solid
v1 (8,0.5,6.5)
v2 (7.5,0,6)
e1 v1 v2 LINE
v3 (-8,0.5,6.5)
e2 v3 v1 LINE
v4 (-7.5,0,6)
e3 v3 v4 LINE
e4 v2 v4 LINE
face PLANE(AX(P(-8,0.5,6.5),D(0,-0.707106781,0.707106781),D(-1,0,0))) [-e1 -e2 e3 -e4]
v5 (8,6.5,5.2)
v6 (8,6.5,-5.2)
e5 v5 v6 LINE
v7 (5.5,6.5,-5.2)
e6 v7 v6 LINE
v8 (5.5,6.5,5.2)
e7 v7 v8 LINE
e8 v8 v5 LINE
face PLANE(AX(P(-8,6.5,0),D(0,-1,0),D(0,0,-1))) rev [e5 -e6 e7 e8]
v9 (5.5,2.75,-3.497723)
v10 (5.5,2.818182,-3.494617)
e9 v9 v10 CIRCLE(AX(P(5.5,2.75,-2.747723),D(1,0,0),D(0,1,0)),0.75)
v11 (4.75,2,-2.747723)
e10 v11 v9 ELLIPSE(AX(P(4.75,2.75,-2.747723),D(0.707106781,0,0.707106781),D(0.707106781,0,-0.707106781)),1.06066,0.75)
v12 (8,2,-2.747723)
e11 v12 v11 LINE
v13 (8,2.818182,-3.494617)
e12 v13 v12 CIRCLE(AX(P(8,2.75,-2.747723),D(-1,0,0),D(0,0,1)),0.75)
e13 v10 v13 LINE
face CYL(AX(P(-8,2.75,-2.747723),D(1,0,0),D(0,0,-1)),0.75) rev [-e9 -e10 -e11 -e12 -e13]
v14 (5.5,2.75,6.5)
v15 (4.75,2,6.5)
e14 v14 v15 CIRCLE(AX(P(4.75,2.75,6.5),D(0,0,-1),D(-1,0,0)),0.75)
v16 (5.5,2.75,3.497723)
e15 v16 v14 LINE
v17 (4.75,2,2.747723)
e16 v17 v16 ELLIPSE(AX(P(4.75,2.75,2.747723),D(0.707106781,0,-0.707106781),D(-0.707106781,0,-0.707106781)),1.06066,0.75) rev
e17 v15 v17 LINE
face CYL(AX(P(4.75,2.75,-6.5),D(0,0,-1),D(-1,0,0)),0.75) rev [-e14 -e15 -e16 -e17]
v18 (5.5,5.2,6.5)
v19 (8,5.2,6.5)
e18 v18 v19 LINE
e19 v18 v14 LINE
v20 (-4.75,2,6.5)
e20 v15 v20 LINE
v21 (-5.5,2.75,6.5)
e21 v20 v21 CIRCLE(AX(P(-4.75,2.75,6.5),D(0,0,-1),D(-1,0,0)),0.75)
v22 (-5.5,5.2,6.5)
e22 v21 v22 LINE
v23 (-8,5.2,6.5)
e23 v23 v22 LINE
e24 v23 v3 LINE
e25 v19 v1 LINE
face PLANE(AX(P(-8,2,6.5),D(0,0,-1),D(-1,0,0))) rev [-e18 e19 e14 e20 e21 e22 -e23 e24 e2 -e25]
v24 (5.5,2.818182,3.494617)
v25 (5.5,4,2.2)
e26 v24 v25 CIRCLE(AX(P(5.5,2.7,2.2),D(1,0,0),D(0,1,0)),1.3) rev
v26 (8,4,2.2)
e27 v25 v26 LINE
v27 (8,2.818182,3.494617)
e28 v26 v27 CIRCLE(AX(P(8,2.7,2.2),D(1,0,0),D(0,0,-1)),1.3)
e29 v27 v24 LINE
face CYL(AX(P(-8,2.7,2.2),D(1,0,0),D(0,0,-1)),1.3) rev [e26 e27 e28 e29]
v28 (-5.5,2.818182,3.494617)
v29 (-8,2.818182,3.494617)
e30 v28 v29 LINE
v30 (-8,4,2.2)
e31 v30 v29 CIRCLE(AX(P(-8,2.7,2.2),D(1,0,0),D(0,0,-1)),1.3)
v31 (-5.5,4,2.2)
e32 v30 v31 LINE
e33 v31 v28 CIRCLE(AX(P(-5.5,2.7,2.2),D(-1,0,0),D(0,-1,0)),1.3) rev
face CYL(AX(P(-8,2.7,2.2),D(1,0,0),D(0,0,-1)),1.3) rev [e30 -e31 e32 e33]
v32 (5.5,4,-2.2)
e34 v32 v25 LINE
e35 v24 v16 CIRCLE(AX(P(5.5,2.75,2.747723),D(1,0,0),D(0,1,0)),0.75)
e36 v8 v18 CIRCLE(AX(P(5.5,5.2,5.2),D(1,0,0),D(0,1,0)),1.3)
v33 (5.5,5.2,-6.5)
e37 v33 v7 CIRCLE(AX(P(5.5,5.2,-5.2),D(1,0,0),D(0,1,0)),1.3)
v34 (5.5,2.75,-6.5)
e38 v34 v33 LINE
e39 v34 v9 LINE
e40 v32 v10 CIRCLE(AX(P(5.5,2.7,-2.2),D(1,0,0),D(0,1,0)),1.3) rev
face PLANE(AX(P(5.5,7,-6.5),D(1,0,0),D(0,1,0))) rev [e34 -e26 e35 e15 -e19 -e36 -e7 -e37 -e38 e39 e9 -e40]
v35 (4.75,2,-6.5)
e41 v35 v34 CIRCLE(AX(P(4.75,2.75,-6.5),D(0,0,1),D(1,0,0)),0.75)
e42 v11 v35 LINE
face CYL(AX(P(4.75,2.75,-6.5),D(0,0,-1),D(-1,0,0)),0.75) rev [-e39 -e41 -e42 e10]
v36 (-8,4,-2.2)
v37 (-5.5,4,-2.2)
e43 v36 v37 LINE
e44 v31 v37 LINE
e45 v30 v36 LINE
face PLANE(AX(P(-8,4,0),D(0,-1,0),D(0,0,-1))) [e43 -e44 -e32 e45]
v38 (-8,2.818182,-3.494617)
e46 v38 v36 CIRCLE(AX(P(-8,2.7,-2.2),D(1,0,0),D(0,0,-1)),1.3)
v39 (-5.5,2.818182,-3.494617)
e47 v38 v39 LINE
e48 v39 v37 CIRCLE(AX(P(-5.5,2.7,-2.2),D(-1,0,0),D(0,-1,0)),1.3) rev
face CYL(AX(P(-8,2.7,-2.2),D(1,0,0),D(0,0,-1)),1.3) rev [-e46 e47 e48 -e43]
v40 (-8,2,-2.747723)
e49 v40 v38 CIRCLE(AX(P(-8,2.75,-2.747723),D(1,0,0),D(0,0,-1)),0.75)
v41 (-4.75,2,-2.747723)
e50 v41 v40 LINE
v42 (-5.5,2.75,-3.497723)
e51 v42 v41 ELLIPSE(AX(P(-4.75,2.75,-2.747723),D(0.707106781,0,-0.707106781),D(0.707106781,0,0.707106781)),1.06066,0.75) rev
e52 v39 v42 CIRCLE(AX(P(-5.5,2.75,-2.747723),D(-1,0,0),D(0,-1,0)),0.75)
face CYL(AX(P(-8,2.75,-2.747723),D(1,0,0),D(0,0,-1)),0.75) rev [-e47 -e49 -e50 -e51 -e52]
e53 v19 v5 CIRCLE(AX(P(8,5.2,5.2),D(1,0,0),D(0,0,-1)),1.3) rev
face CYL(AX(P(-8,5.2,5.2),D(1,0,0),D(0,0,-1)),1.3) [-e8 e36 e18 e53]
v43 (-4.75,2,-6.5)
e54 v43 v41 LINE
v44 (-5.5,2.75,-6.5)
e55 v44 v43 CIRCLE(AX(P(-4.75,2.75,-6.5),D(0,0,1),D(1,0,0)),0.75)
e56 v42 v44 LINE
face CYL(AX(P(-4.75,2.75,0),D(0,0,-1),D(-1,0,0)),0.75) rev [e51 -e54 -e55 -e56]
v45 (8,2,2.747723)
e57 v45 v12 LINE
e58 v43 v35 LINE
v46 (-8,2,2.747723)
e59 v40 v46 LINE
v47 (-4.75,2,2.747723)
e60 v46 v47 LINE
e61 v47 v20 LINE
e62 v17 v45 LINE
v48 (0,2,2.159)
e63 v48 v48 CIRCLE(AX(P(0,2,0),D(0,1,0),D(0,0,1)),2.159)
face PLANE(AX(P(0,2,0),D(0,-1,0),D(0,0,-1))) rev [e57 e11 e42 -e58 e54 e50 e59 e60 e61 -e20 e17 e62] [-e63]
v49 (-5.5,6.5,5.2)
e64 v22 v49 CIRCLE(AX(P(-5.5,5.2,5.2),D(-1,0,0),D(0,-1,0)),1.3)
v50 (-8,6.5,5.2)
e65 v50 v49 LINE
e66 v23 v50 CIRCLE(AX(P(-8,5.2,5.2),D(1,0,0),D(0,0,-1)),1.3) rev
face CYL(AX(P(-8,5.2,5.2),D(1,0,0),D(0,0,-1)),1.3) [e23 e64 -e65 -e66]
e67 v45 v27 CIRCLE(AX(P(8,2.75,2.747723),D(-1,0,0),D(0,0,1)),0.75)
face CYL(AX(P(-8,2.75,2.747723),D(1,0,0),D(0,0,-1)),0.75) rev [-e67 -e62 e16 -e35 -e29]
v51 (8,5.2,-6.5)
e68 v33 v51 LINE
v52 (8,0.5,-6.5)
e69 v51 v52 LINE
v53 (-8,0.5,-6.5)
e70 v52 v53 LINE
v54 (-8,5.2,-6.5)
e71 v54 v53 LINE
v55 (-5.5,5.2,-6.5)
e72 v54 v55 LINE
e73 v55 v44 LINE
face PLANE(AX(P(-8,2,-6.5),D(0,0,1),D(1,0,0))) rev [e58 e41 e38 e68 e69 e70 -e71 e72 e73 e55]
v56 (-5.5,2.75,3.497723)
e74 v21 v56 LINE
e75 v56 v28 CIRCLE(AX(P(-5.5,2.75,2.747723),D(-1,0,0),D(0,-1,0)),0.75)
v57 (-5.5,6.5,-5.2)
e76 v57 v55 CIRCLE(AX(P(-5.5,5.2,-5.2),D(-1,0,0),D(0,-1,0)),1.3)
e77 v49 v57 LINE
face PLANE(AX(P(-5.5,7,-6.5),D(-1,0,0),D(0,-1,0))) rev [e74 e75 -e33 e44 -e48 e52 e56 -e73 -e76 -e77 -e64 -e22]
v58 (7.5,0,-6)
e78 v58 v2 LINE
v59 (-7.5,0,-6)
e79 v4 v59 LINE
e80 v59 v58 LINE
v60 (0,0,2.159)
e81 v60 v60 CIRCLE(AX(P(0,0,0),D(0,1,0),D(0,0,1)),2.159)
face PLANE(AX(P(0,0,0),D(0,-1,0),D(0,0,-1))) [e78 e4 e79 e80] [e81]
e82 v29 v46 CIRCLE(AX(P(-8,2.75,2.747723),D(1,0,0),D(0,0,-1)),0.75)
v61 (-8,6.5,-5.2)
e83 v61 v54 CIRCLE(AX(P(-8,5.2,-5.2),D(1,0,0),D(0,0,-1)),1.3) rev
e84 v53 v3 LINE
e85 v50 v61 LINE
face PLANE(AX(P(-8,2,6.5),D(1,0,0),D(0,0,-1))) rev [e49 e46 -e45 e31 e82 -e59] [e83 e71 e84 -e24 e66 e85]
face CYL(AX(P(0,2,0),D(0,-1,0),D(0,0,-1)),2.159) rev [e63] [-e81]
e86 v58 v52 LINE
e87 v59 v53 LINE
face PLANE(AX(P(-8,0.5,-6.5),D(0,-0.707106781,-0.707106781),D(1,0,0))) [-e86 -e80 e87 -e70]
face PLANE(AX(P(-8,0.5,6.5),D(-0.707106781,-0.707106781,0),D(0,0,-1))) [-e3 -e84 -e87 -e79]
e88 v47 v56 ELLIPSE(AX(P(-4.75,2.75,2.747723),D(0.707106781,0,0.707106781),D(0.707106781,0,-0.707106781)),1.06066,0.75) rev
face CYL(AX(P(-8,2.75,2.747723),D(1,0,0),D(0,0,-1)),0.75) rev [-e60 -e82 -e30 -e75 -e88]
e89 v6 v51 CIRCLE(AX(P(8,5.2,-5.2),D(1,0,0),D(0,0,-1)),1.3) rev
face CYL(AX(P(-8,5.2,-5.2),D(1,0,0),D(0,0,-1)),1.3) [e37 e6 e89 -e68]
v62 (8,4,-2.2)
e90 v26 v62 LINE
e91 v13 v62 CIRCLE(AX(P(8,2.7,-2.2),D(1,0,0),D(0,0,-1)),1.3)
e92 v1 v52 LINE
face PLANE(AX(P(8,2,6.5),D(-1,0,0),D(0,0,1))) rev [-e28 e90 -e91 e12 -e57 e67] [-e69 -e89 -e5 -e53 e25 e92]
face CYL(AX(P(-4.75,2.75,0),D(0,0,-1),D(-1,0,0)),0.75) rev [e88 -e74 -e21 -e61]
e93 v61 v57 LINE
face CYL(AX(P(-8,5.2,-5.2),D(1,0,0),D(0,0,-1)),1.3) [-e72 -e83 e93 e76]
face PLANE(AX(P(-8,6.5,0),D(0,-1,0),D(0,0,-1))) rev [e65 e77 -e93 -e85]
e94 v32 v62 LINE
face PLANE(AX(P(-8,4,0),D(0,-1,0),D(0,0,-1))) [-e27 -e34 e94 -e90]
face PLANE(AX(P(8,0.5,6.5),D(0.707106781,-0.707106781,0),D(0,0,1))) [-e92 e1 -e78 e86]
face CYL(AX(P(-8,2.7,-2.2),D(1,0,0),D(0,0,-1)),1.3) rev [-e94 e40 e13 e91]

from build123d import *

# Parameters (mm, degrees)
SKETCH1_W               = 16
SKETCH1_H               = 13
SKETCH1_R               = 2.159
BOSS_EXTRUDE1_DEPTH     = 2
BOSS_EXTRUDE2_DEPTH     = 16
CUT_EXTRUDE1_DEPTH      = 17.590660023
CUT_EXTRUDE1_DEPTH_BACK = 17.590660023
SKETCH4_W               = 11
SKETCH4_H               = 5
FILLET1_R               = 0.75
CHAMFER1_SIZE           = 0.5


with BuildPart() as part:
    # Sketch1 → Boss-Extrude1 (new body)
    with BuildSketch(Plane(origin=(0, 0, 0), x_dir=(1, 0, 0), z_dir=(0, 1, 0))):
        Rectangle(SKETCH1_W, SKETCH1_H)
        with Locations(Location((0, 0, 0), (0, 0, 270))):
            Circle(SKETCH1_R, mode=Mode.SUBTRACT)
    extrude(amount=BOSS_EXTRUDE1_DEPTH)

    # Sketch2 → Boss-Extrude2 (add)
    with BuildSketch(Plane(origin=(8, 0, 0), x_dir=(0, 0, -1), z_dir=(1, 0, 0))):
        with BuildLine():
            Line((-6.5, 5.2), (-6.5, 2))
            Line((-6.5, 2), (-3.5, 2))
            Line((-3.5, 2), (-3.5, 2.7))
            ThreePointArc((-3.5, 2.7), (-3.119238816, 3.619238816), (-2.2, 4))
            Line((-2.2, 4), (2.2, 4))
            ThreePointArc((2.2, 4), (3.119238816, 3.619238816), (3.5, 2.7))
            Line((3.5, 2.7), (3.5, 2))
            Line((3.5, 2), (6.5, 2))
            Line((6.5, 2), (6.5, 5.2))
            ThreePointArc((6.5, 5.2), (6.119238816, 6.119238816), (5.2, 6.5))
            Line((5.2, 6.5), (-5.2, 6.5))
            ThreePointArc((-5.2, 6.5), (-6.119238816, 6.119238816), (-6.5, 5.2))
        make_face()
    extrude(amount=-BOSS_EXTRUDE2_DEPTH)

    # Sketch4 → Cut-Extrude1 (cut, two sides: drawn at the far end of the back side and taken through both)
    with BuildSketch(Plane.XY.offset(6.5).offset(-CUT_EXTRUDE1_DEPTH_BACK)):
        with Locations((0, 4.5)):
            Rectangle(SKETCH4_W, SKETCH4_H)
    extrude(amount=CUT_EXTRUDE1_DEPTH + CUT_EXTRUDE1_DEPTH_BACK, mode=Mode.SUBTRACT)

    # Fillet1
    # the kernel refuses this fillet: 0.75 mm, written as the material it adds along each edge
    with BuildSketch(Plane(origin=(-5.5, 2, 3.5), x_dir=(1, 0, 0), z_dir=(0, 0, 1)), Plane(origin=(-5.5, 2, -6.5), x_dir=(1, 0, 0), z_dir=(0, 0, 1))) as fillet1_piece_1:
        with BuildLine():
            CenterArc((FILLET1_R, FILLET1_R), FILLET1_R, 180, 90)
            Line((0, FILLET1_R), (-FILLET1_R * 0.02, FILLET1_R))
            Line((-FILLET1_R * 0.02, FILLET1_R), (-FILLET1_R * 0.02, -FILLET1_R * 0.02))
            Line((-FILLET1_R * 0.02, -FILLET1_R * 0.02), (FILLET1_R, -FILLET1_R * 0.02))
            Line((FILLET1_R, -FILLET1_R * 0.02), (FILLET1_R, 0))
        make_face()
    extrude(amount=3)
    with BuildSketch(Plane(origin=(-5.5, 2, 3.5), x_dir=(0, 0, -1), z_dir=(-1, 0, 0)), Plane(origin=(8, 2, 3.5), x_dir=(0, 0, -1), z_dir=(-1, 0, 0))) as fillet1_piece_2:
        with BuildLine():
            CenterArc((0.752277442, -0.75), FILLET1_R, 90, 95.21590857)
            Line((0.005383046, -0.818181818), (-0.069306394, -0.825))
            ThreePointArc((-0.069306394, -0.825), (-0.075, -0.7), (-0.075, 0))
            Line((-0.075, 0), (0, 0.075))
            Line((0, 0.075), (0.752277442, 0.075))
            Line((0.752277442, 0.075), (0.752277442, 0))
        make_face()
    extrude(amount=2.5)
    with BuildSketch(Plane(origin=(5.5, 2, 6.5), x_dir=(0, 1, 0), z_dir=(0, 0, -1)), Plane(origin=(5.5, 2, -3.5), x_dir=(0, 1, 0), z_dir=(0, 0, -1))) as fillet1_piece_3:
        with BuildLine():
            CenterArc((FILLET1_R, -FILLET1_R), FILLET1_R, 90, 90)
            Line((0, -FILLET1_R), (-FILLET1_R * 0.02, -FILLET1_R))
            Line((-FILLET1_R * 0.02, -FILLET1_R), (-FILLET1_R * 0.02, FILLET1_R * 0.02))
            Line((-FILLET1_R * 0.02, FILLET1_R * 0.02), (FILLET1_R, FILLET1_R * 0.02))
            Line((FILLET1_R, FILLET1_R * 0.02), (FILLET1_R, 0))
        make_face()
    extrude(amount=3)
    with BuildSketch(Plane(origin=(8, 2, -3.5), x_dir=(0, 0, 1), z_dir=(-1, 0, 0)), Plane(origin=(-5.5, 2, -3.5), x_dir=(0, 0, 1), z_dir=(-1, 0, 0))) as fillet1_piece_4:
        with BuildLine():
            CenterArc((0.752277442, 0.75), FILLET1_R, 174.78409143, 95.21590857)
            Line((0.005383046, 0.818181818), (-0.069306394, 0.825))
            ThreePointArc((-0.069306394, 0.825), (-0.075, 0.7), (-0.075, 0))
            Line((-0.075, 0), (0, -0.075))
            Line((0, -0.075), (0.752277442, -0.075))
            Line((0.752277442, -0.075), (0.752277442, 0))
        make_face()
    extrude(amount=2.5)
    with BuildSketch(Plane(origin=(-5.5, 2, 1.625), x_dir=(1, 0, 0), z_dir=(0, 0, 1))) as fillet1_piece_5a_section:
        with BuildLine():
            CenterArc((FILLET1_R, FILLET1_R), FILLET1_R, 180, 90)
            Line((0, FILLET1_R), (-FILLET1_R * 0.02, FILLET1_R))
            Line((-FILLET1_R * 0.02, FILLET1_R), (-FILLET1_R * 0.02, -FILLET1_R * 0.02))
            Line((-FILLET1_R * 0.02, -FILLET1_R * 0.02), (FILLET1_R, -FILLET1_R * 0.02))
            Line((FILLET1_R, -FILLET1_R * 0.02), (FILLET1_R, 0))
        make_face()
    fillet1_piece_5a = extrude(amount=4.875, mode=Mode.PRIVATE)
    fillet1_piece_5a = split(fillet1_piece_5a, bisect_by=Plane(origin=(-5.330203664, 2.169796336, 3.5), z_dir=(0, 0, -1)), keep=Keep.TOP, mode=Mode.PRIVATE)
    with BuildSketch(Plane(origin=(-3.454501184, 2, 3.5), x_dir=(0, 0, -1), z_dir=(-1, 0, 0))) as fillet1_piece_5b_section:
        with BuildLine():
            CenterArc((0.752277442, -0.75), FILLET1_R, 90, 95.21590857)
            Line((0.005383046, -0.818181818), (-0.069306394, -0.825))
            ThreePointArc((-0.069306394, -0.825), (-0.075, -0.7), (-0.075, 0))
            Line((-0.075, 0), (0, 0.075))
            Line((0, 0.075), (0.752277442, 0.075))
            Line((0.752277442, 0.075), (0.752277442, 0))
        make_face()
    fillet1_piece_5b = extrude(amount=4.545498816, mode=Mode.PRIVATE)
    fillet1_piece_5b = split(fillet1_piece_5b, bisect_by=Plane(origin=(-5.5, 2.182819777, 3.341220423), z_dir=(1, 0, 0)), keep=Keep.TOP, mode=Mode.PRIVATE)
    fillet1_piece_5 = fillet1_piece_5a & fillet1_piece_5b
    add(fillet1_piece_5)
    with BuildSketch(Plane(origin=(5.5, 2, 6.5), x_dir=(0, 1, 0), z_dir=(0, 0, -1))) as fillet1_piece_6a_section:
        with BuildLine():
            CenterArc((FILLET1_R, -FILLET1_R), FILLET1_R, 90, 90)
            Line((0, -FILLET1_R), (-FILLET1_R * 0.02, -FILLET1_R))
            Line((-FILLET1_R * 0.02, -FILLET1_R), (-FILLET1_R * 0.02, FILLET1_R * 0.02))
            Line((-FILLET1_R * 0.02, FILLET1_R * 0.02), (FILLET1_R, FILLET1_R * 0.02))
            Line((FILLET1_R, FILLET1_R * 0.02), (FILLET1_R, 0))
        make_face()
    fillet1_piece_6a = extrude(amount=4.875, mode=Mode.PRIVATE)
    fillet1_piece_6a = split(fillet1_piece_6a, bisect_by=Plane(origin=(5.330203664, 2.169796336, 3.5), z_dir=(0, 0, -1)), keep=Keep.TOP, mode=Mode.PRIVATE)
    with BuildSketch(Plane(origin=(8, 2, 3.5), x_dir=(0, 0, -1), z_dir=(-1, 0, 0))) as fillet1_piece_6b_section:
        with BuildLine():
            CenterArc((0.752277442, -0.75), FILLET1_R, 90, 95.21590857)
            Line((0.005383046, -0.818181818), (-0.069306394, -0.825))
            ThreePointArc((-0.069306394, -0.825), (-0.075, -0.7), (-0.075, 0))
            Line((-0.075, 0), (0, 0.075))
            Line((0, 0.075), (0.752277442, 0.075))
            Line((0.752277442, 0.075), (0.752277442, 0))
        make_face()
    fillet1_piece_6b = extrude(amount=4.545498816, mode=Mode.PRIVATE)
    fillet1_piece_6b = split(fillet1_piece_6b, bisect_by=Plane(origin=(5.5, 2.182819777, 3.341220423), z_dir=(-1, 0, 0)), keep=Keep.TOP, mode=Mode.PRIVATE)
    fillet1_piece_6 = fillet1_piece_6a & fillet1_piece_6b
    add(fillet1_piece_6)
    with BuildSketch(Plane(origin=(5.5, 2, -1.625), x_dir=(0, 1, 0), z_dir=(0, 0, -1))) as fillet1_piece_7a_section:
        with BuildLine():
            CenterArc((FILLET1_R, -FILLET1_R), FILLET1_R, 90, 90)
            Line((0, -FILLET1_R), (-FILLET1_R * 0.02, -FILLET1_R))
            Line((-FILLET1_R * 0.02, -FILLET1_R), (-FILLET1_R * 0.02, FILLET1_R * 0.02))
            Line((-FILLET1_R * 0.02, FILLET1_R * 0.02), (FILLET1_R, FILLET1_R * 0.02))
            Line((FILLET1_R, FILLET1_R * 0.02), (FILLET1_R, 0))
        make_face()
    fillet1_piece_7a = extrude(amount=4.875, mode=Mode.PRIVATE)
    fillet1_piece_7a = split(fillet1_piece_7a, bisect_by=Plane(origin=(5.330203664, 2.169796336, -3.5), z_dir=(0, 0, 1)), keep=Keep.TOP, mode=Mode.PRIVATE)
    with BuildSketch(Plane(origin=(8, 2, -3.5), x_dir=(0, 0, 1), z_dir=(-1, 0, 0))) as fillet1_piece_7b_section:
        with BuildLine():
            CenterArc((0.752277442, 0.75), FILLET1_R, 174.78409143, 95.21590857)
            Line((0.005383046, 0.818181818), (-0.069306394, 0.825))
            ThreePointArc((-0.069306394, 0.825), (-0.075, 0.7), (-0.075, 0))
            Line((-0.075, 0), (0, -0.075))
            Line((0, -0.075), (0.752277442, -0.075))
            Line((0.752277442, -0.075), (0.752277442, 0))
        make_face()
    fillet1_piece_7b = extrude(amount=4.545498816, mode=Mode.PRIVATE)
    fillet1_piece_7b = split(fillet1_piece_7b, bisect_by=Plane(origin=(5.5, 2.182819777, -3.341220423), z_dir=(-1, 0, 0)), keep=Keep.TOP, mode=Mode.PRIVATE)
    fillet1_piece_7 = fillet1_piece_7a & fillet1_piece_7b
    add(fillet1_piece_7)
    with BuildSketch(Plane(origin=(-3.454501184, 2, -3.5), x_dir=(0, 0, 1), z_dir=(-1, 0, 0))) as fillet1_piece_8a_section:
        with BuildLine():
            CenterArc((0.752277442, 0.75), FILLET1_R, 174.78409143, 95.21590857)
            Line((0.005383046, 0.818181818), (-0.069306394, 0.825))
            ThreePointArc((-0.069306394, 0.825), (-0.075, 0.7), (-0.075, 0))
            Line((-0.075, 0), (0, -0.075))
            Line((0, -0.075), (0.752277442, -0.075))
            Line((0.752277442, -0.075), (0.752277442, 0))
        make_face()
    fillet1_piece_8a = extrude(amount=4.545498816, mode=Mode.PRIVATE)
    fillet1_piece_8a = split(fillet1_piece_8a, bisect_by=Plane(origin=(-5.5, 2.182819777, -3.341220423), z_dir=(1, 0, 0)), keep=Keep.TOP, mode=Mode.PRIVATE)
    with BuildSketch(Plane(origin=(-5.5, 2, -6.5), x_dir=(1, 0, 0), z_dir=(0, 0, 1))) as fillet1_piece_8b_section:
        with BuildLine():
            CenterArc((FILLET1_R, FILLET1_R), FILLET1_R, 180, 90)
            Line((0, FILLET1_R), (-FILLET1_R * 0.02, FILLET1_R))
            Line((-FILLET1_R * 0.02, FILLET1_R), (-FILLET1_R * 0.02, -FILLET1_R * 0.02))
            Line((-FILLET1_R * 0.02, -FILLET1_R * 0.02), (FILLET1_R, -FILLET1_R * 0.02))
            Line((FILLET1_R, -FILLET1_R * 0.02), (FILLET1_R, 0))
        make_face()
    fillet1_piece_8b = extrude(amount=4.875, mode=Mode.PRIVATE)
    fillet1_piece_8b = split(fillet1_piece_8b, bisect_by=Plane(origin=(-5.330203664, 2.169796336, -3.5), z_dir=(0, 0, 1)), keep=Keep.TOP, mode=Mode.PRIVATE)
    fillet1_piece_8 = fillet1_piece_8a & fillet1_piece_8b
    add(fillet1_piece_8)

    # Chamfer1
    chamfer1_edges = [part.edges().sort_by_distance(p)[0] for p in [
        (0, 0, 6.5),
        (-8, 0, 0),
        (0, 0, -6.5),
        (8, 0, 0),
    ]]
    chamfer(chamfer1_edges, length=CHAMFER1_SIZE)


solid = part.part
